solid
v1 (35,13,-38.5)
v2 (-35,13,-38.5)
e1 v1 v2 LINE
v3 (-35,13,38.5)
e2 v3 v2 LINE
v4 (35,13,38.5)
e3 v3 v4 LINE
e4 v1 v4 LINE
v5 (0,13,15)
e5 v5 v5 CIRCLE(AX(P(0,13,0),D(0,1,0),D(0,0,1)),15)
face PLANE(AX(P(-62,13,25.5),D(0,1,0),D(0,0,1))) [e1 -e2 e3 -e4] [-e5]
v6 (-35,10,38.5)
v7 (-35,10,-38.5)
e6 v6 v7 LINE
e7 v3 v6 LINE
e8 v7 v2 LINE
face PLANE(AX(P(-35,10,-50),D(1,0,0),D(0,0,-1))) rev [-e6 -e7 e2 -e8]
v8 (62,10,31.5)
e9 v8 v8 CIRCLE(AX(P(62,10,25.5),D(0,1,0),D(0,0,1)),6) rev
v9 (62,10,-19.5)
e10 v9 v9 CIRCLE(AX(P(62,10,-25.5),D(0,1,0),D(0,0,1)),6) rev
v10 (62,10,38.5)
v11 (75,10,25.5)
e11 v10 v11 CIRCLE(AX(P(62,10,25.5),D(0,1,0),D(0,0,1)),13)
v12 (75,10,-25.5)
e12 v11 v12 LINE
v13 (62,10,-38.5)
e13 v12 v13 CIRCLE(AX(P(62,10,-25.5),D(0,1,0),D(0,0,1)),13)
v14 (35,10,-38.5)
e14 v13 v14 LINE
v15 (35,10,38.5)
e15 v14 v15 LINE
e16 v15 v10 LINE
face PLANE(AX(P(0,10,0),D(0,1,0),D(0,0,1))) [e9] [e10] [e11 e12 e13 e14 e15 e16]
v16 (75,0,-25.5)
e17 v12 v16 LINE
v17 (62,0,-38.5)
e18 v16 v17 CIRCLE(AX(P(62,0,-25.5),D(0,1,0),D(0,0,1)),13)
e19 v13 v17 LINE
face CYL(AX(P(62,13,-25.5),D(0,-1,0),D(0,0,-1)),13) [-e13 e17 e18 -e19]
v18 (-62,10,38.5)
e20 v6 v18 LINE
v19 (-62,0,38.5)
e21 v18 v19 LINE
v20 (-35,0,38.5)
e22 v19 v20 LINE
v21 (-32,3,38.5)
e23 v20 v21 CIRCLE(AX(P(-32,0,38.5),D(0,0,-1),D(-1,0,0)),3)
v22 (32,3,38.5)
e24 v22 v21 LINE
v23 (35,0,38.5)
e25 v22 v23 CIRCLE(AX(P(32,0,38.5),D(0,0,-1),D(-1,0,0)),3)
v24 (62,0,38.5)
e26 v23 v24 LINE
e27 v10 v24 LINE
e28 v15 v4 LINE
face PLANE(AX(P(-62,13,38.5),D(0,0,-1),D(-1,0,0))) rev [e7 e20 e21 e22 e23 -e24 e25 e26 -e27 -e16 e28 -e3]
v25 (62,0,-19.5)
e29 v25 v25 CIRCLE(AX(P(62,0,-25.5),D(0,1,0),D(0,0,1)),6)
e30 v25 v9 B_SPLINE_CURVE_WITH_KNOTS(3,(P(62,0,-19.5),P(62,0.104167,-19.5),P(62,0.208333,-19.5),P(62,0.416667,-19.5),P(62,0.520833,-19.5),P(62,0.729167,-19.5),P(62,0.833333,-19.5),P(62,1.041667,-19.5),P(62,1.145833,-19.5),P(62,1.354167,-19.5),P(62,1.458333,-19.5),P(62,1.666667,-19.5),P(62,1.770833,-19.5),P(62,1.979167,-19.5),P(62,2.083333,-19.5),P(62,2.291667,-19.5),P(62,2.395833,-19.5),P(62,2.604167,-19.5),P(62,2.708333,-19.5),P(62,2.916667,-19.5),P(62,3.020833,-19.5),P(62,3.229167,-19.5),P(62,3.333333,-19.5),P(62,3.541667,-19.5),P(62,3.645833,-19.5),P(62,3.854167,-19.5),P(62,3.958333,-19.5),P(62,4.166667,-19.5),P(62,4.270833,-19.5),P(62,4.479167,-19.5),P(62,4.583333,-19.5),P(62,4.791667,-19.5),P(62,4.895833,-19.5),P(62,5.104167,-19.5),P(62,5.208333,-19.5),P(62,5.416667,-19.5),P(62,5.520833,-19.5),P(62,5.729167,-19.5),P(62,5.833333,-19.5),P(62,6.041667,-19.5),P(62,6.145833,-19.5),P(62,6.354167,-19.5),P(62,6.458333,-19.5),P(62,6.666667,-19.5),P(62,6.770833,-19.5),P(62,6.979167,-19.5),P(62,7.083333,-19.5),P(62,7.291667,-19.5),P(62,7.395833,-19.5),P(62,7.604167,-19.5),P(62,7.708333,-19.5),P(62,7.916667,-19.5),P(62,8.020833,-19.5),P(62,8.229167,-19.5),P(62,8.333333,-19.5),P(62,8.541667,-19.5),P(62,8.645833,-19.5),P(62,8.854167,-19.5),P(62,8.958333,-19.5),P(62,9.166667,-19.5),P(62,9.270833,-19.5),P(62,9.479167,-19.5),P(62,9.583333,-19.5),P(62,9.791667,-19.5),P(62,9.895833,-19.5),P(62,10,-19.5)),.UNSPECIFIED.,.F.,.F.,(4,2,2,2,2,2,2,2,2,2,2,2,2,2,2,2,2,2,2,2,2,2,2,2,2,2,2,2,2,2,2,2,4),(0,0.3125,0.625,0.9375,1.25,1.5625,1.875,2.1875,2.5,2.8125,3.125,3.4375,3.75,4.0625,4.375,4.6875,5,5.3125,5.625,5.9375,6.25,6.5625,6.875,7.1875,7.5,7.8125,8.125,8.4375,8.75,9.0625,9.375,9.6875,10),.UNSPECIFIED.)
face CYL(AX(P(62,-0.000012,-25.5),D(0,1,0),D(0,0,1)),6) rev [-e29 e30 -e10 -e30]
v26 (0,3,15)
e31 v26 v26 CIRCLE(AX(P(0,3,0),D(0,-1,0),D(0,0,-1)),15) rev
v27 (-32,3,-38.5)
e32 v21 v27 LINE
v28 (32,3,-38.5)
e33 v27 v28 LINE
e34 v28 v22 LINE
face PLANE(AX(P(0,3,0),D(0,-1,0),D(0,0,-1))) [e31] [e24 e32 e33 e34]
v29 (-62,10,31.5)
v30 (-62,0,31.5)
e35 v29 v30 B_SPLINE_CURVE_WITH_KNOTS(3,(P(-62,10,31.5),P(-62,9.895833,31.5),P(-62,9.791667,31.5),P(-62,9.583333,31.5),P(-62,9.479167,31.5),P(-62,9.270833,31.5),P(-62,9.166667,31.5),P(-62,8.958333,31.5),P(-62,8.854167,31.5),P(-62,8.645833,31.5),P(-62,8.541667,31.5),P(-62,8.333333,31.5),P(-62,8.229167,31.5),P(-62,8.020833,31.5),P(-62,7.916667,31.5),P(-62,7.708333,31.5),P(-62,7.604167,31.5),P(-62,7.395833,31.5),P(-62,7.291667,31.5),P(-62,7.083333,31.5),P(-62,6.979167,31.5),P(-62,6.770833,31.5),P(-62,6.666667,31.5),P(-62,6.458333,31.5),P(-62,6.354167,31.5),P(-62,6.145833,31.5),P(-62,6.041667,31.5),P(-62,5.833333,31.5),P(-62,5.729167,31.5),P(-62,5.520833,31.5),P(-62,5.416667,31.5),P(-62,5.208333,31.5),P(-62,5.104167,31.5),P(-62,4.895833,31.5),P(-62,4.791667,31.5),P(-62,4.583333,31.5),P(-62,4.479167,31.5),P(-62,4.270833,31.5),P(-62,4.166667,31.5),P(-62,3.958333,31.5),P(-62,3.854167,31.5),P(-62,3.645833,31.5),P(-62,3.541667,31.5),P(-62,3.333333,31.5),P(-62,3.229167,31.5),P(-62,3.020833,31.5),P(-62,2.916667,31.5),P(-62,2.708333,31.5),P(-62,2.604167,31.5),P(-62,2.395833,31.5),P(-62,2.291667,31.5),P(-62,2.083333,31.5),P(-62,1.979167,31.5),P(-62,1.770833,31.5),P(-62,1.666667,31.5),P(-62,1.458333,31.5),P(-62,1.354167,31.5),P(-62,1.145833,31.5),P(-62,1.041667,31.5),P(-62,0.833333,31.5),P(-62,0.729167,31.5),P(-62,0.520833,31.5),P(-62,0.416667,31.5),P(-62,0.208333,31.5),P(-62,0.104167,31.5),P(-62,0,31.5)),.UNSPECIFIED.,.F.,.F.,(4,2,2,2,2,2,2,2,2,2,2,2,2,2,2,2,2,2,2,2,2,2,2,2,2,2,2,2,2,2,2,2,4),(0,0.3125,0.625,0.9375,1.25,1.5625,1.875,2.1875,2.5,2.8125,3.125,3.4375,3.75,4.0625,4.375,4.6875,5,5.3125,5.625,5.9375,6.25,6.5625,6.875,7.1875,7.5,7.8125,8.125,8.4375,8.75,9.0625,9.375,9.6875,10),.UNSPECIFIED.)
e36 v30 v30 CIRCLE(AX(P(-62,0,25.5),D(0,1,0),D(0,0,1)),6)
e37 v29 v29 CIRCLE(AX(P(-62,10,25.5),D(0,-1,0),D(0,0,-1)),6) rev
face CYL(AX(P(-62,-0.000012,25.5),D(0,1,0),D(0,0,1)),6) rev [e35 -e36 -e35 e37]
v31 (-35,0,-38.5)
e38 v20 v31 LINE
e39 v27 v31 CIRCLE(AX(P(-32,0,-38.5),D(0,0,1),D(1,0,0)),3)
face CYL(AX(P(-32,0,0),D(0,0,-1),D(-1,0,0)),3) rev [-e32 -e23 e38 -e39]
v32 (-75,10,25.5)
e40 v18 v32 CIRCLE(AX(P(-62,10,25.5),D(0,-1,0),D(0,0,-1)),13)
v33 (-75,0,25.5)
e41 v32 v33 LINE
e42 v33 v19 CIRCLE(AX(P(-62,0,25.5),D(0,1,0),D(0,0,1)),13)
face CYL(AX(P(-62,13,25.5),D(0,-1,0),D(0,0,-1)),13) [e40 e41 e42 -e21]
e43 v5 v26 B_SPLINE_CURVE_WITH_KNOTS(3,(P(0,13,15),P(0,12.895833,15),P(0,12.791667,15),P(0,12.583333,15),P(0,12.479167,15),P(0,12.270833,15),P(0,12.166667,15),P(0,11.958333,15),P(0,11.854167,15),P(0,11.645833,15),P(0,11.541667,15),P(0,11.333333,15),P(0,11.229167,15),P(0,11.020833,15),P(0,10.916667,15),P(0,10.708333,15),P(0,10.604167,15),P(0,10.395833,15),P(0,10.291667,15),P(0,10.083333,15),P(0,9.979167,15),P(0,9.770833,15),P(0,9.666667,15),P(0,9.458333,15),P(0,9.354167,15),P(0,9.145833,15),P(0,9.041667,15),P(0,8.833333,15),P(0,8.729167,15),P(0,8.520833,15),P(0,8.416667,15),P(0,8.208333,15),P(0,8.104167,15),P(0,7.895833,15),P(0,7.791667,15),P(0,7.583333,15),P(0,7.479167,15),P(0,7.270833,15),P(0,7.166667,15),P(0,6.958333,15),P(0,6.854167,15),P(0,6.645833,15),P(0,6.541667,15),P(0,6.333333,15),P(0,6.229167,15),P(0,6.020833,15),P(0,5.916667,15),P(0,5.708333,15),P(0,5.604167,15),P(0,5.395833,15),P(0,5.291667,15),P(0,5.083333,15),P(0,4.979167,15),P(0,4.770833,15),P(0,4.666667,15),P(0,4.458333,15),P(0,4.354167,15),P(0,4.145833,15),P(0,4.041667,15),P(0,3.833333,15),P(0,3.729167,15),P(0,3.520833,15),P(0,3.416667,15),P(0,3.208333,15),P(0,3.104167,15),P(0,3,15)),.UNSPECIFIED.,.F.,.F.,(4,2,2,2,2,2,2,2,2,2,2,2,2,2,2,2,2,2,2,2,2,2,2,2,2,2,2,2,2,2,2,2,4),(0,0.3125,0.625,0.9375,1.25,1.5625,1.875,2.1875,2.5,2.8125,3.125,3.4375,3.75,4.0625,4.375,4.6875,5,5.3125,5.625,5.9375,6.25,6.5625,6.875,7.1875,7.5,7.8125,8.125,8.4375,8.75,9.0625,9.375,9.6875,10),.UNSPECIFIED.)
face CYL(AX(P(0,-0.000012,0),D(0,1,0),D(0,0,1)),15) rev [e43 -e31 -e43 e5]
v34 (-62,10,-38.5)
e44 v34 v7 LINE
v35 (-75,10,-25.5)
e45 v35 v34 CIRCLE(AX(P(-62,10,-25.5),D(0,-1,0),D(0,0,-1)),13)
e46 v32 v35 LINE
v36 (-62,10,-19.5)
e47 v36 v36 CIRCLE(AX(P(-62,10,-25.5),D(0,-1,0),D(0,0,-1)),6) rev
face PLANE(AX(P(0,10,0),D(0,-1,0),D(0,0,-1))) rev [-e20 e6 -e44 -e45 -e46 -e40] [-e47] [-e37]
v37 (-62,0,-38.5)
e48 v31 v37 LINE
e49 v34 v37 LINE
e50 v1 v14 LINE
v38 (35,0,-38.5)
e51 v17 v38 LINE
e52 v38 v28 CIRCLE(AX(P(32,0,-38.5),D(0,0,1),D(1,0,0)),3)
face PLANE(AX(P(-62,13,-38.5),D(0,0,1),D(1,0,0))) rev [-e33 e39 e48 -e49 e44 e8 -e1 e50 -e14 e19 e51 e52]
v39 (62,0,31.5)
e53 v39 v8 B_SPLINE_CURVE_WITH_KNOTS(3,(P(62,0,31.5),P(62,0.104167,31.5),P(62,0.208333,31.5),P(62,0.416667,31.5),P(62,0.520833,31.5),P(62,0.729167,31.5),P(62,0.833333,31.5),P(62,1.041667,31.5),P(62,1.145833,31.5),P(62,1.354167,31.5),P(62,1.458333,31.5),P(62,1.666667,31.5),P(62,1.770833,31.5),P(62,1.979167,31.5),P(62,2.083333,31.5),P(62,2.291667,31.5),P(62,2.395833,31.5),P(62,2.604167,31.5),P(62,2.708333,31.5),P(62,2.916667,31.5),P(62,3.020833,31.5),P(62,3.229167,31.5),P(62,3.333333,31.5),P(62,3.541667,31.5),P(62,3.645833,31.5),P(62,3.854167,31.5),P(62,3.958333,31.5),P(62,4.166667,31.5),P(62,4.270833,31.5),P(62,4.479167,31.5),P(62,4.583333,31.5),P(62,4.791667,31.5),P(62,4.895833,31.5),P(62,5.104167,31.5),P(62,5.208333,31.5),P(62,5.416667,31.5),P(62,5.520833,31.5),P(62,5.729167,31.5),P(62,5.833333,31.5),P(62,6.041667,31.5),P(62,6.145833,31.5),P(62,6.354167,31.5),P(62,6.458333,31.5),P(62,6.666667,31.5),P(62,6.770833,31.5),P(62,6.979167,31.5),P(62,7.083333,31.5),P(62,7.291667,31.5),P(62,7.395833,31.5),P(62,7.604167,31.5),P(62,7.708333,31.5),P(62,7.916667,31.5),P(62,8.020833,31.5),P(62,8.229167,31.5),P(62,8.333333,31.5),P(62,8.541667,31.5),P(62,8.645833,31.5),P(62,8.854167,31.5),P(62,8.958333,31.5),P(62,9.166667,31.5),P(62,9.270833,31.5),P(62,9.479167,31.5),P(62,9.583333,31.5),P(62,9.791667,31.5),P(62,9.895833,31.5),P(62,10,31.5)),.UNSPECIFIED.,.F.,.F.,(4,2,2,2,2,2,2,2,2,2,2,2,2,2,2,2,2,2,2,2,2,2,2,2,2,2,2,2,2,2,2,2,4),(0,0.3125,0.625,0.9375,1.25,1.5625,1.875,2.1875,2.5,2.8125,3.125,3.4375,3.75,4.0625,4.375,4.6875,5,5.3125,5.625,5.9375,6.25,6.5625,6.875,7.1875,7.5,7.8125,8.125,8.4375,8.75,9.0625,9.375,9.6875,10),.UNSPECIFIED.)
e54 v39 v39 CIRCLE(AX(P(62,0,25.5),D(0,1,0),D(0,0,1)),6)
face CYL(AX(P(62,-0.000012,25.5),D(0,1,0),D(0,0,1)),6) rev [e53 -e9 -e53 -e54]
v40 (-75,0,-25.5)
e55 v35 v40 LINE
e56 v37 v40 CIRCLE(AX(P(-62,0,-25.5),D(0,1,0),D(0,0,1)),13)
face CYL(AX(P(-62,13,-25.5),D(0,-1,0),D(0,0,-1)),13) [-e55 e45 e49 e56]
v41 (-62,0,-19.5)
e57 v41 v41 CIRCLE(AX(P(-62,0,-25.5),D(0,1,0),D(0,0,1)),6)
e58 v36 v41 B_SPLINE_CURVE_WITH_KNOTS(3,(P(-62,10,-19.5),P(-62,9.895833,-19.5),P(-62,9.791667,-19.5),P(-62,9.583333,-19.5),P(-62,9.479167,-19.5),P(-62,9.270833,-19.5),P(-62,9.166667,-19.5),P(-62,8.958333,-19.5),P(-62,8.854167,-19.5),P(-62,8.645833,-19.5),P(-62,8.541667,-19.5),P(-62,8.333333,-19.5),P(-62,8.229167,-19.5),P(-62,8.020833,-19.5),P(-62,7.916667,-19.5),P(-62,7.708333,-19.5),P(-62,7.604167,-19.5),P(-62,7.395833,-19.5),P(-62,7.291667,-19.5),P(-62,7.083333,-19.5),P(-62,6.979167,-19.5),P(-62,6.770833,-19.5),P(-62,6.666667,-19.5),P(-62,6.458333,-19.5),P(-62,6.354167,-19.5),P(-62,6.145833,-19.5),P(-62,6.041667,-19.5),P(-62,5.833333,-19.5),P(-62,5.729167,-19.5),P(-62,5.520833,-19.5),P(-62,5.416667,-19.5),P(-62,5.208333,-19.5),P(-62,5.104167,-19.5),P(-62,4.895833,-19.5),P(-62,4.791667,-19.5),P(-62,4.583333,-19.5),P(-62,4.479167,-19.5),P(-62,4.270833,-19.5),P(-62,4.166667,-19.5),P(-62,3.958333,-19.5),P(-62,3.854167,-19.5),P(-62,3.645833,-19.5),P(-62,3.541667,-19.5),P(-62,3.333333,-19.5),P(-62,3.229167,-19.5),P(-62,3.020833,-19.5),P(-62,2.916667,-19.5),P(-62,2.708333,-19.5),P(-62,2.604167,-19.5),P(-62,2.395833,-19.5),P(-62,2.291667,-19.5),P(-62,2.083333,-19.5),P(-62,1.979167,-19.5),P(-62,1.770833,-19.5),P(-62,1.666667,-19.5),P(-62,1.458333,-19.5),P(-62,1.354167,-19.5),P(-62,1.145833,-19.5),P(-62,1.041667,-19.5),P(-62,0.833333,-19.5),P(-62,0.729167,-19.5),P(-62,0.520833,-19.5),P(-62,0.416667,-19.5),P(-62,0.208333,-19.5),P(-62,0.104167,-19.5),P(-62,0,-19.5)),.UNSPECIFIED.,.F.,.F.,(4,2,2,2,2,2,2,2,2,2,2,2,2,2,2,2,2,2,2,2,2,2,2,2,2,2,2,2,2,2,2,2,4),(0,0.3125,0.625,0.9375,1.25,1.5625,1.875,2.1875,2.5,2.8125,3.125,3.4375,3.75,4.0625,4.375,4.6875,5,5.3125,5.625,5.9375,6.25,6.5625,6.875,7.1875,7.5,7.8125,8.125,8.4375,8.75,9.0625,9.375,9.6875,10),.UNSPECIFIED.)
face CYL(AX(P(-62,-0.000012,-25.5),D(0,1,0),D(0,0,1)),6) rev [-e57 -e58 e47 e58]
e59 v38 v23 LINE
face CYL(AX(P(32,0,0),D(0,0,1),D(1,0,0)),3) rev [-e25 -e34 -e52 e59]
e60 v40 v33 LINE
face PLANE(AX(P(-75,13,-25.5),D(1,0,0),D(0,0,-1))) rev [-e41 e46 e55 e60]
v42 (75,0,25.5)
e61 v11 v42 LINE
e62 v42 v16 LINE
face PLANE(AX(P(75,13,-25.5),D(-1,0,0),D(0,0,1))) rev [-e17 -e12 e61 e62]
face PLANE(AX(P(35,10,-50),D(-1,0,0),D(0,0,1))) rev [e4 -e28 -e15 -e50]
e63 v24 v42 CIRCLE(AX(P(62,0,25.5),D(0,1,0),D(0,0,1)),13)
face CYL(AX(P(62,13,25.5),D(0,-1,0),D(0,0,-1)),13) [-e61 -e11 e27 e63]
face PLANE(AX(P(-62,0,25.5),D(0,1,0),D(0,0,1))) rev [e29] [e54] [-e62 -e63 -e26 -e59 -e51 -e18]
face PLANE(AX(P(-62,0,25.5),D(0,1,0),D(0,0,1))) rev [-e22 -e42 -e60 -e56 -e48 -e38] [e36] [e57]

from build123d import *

# Parameters (mm, degrees)
EXTRUDE_2_DEPTH          = 13
CUT_EXTRUDE_2_DEPTH      = 86.300937861
CUT_EXTRUDE_2_DEPTH_BACK = 86.300937861
SKETCH_2_R               = 6
SKETCH_2_R_2             = 15
SKETCH_3_W               = 100
SKETCH_3_H               = 100
CUT_EXTRUDE_3_DEPTH      = 3
SKETCH_4_W               = 70
SKETCH_4_H               = 77
CUT_EXTRUDE_4_DEPTH      = 3
FILLET_1_R               = 3


with BuildPart() as part:
    # 스케치1 → 보스-돌출2 (new body)
    with BuildSketch(Plane(origin=(0, 0, 0), x_dir=(1, 0, 0), z_dir=(0, 1, 0))):
        with BuildLine():
            Line((-62, 38.5), (62, 38.5))
            ThreePointArc((62, 38.5), (71.192388155, 34.692388155), (75, 25.5))
            Line((75, 25.5), (75, -25.5))
            ThreePointArc((75, -25.5), (71.192388155, -34.692388155), (62, -38.5))
            Line((62, -38.5), (-62, -38.5))
            ThreePointArc((-62, -38.5), (-71.192388155, -34.692388155), (-75, -25.5))
            Line((-75, -25.5), (-75, 25.5))
            ThreePointArc((-75, 25.5), (-71.192388155, 34.692388155), (-62, 38.5))
        make_face()
    extrude(amount=EXTRUDE_2_DEPTH)

    # 스케치2 → 컷-돌출2 (cut, two sides: drawn at the far end of the back side and taken through both)
    with BuildSketch(Plane(origin=(0, 0, 0), x_dir=(1, 0, 0), z_dir=(0, 1, 0)).offset(-CUT_EXTRUDE_2_DEPTH_BACK)):
        with Locations(Location((-62, 25.5, 0), (0, 0, 270))):
            Circle(SKETCH_2_R)
        with Locations(Location((-62, -25.5, 0), (0, 0, 270))):
            Circle(SKETCH_2_R)
        with Locations(Location((62, -25.5, 0), (0, 0, 270))):
            Circle(SKETCH_2_R)
        with Locations(Location((62, 25.5, 0), (0, 0, 270))):
            Circle(SKETCH_2_R)
        with Locations(Location((0, 0, 0), (0, 0, 270))):
            Circle(SKETCH_2_R_2)
    extrude(amount=CUT_EXTRUDE_2_DEPTH + CUT_EXTRUDE_2_DEPTH_BACK, mode=Mode.SUBTRACT)

    # 스케치3 → 컷-돌출3 (cut)
    with BuildSketch(Plane(origin=(0, 13, 0), x_dir=(1, 0, 0), z_dir=(0, 1, 0))):
        with Locations((85, 0)):
            Rectangle(SKETCH_3_W, SKETCH_3_H)
        with Locations((-85, 0)):
            Rectangle(SKETCH_3_W, SKETCH_3_H)
    extrude(amount=-CUT_EXTRUDE_3_DEPTH, mode=Mode.SUBTRACT)

    # 스케치4 → 컷-돌출4 (cut)
    with BuildSketch(Plane.XZ):
        Rectangle(SKETCH_4_W, SKETCH_4_H)
    extrude(amount=-CUT_EXTRUDE_4_DEPTH, mode=Mode.SUBTRACT)

    # 필렛1
    fillet_1_edges = [part.edges().sort_by_distance(p)[0] for p in [
        (-35, 3, 0),
        (35, 3, 0),
    ]]
    fillet(fillet_1_edges, radius=FILLET_1_R - 0.0001)  # a hair under: the kernel refuses the full size


solid = part.part
